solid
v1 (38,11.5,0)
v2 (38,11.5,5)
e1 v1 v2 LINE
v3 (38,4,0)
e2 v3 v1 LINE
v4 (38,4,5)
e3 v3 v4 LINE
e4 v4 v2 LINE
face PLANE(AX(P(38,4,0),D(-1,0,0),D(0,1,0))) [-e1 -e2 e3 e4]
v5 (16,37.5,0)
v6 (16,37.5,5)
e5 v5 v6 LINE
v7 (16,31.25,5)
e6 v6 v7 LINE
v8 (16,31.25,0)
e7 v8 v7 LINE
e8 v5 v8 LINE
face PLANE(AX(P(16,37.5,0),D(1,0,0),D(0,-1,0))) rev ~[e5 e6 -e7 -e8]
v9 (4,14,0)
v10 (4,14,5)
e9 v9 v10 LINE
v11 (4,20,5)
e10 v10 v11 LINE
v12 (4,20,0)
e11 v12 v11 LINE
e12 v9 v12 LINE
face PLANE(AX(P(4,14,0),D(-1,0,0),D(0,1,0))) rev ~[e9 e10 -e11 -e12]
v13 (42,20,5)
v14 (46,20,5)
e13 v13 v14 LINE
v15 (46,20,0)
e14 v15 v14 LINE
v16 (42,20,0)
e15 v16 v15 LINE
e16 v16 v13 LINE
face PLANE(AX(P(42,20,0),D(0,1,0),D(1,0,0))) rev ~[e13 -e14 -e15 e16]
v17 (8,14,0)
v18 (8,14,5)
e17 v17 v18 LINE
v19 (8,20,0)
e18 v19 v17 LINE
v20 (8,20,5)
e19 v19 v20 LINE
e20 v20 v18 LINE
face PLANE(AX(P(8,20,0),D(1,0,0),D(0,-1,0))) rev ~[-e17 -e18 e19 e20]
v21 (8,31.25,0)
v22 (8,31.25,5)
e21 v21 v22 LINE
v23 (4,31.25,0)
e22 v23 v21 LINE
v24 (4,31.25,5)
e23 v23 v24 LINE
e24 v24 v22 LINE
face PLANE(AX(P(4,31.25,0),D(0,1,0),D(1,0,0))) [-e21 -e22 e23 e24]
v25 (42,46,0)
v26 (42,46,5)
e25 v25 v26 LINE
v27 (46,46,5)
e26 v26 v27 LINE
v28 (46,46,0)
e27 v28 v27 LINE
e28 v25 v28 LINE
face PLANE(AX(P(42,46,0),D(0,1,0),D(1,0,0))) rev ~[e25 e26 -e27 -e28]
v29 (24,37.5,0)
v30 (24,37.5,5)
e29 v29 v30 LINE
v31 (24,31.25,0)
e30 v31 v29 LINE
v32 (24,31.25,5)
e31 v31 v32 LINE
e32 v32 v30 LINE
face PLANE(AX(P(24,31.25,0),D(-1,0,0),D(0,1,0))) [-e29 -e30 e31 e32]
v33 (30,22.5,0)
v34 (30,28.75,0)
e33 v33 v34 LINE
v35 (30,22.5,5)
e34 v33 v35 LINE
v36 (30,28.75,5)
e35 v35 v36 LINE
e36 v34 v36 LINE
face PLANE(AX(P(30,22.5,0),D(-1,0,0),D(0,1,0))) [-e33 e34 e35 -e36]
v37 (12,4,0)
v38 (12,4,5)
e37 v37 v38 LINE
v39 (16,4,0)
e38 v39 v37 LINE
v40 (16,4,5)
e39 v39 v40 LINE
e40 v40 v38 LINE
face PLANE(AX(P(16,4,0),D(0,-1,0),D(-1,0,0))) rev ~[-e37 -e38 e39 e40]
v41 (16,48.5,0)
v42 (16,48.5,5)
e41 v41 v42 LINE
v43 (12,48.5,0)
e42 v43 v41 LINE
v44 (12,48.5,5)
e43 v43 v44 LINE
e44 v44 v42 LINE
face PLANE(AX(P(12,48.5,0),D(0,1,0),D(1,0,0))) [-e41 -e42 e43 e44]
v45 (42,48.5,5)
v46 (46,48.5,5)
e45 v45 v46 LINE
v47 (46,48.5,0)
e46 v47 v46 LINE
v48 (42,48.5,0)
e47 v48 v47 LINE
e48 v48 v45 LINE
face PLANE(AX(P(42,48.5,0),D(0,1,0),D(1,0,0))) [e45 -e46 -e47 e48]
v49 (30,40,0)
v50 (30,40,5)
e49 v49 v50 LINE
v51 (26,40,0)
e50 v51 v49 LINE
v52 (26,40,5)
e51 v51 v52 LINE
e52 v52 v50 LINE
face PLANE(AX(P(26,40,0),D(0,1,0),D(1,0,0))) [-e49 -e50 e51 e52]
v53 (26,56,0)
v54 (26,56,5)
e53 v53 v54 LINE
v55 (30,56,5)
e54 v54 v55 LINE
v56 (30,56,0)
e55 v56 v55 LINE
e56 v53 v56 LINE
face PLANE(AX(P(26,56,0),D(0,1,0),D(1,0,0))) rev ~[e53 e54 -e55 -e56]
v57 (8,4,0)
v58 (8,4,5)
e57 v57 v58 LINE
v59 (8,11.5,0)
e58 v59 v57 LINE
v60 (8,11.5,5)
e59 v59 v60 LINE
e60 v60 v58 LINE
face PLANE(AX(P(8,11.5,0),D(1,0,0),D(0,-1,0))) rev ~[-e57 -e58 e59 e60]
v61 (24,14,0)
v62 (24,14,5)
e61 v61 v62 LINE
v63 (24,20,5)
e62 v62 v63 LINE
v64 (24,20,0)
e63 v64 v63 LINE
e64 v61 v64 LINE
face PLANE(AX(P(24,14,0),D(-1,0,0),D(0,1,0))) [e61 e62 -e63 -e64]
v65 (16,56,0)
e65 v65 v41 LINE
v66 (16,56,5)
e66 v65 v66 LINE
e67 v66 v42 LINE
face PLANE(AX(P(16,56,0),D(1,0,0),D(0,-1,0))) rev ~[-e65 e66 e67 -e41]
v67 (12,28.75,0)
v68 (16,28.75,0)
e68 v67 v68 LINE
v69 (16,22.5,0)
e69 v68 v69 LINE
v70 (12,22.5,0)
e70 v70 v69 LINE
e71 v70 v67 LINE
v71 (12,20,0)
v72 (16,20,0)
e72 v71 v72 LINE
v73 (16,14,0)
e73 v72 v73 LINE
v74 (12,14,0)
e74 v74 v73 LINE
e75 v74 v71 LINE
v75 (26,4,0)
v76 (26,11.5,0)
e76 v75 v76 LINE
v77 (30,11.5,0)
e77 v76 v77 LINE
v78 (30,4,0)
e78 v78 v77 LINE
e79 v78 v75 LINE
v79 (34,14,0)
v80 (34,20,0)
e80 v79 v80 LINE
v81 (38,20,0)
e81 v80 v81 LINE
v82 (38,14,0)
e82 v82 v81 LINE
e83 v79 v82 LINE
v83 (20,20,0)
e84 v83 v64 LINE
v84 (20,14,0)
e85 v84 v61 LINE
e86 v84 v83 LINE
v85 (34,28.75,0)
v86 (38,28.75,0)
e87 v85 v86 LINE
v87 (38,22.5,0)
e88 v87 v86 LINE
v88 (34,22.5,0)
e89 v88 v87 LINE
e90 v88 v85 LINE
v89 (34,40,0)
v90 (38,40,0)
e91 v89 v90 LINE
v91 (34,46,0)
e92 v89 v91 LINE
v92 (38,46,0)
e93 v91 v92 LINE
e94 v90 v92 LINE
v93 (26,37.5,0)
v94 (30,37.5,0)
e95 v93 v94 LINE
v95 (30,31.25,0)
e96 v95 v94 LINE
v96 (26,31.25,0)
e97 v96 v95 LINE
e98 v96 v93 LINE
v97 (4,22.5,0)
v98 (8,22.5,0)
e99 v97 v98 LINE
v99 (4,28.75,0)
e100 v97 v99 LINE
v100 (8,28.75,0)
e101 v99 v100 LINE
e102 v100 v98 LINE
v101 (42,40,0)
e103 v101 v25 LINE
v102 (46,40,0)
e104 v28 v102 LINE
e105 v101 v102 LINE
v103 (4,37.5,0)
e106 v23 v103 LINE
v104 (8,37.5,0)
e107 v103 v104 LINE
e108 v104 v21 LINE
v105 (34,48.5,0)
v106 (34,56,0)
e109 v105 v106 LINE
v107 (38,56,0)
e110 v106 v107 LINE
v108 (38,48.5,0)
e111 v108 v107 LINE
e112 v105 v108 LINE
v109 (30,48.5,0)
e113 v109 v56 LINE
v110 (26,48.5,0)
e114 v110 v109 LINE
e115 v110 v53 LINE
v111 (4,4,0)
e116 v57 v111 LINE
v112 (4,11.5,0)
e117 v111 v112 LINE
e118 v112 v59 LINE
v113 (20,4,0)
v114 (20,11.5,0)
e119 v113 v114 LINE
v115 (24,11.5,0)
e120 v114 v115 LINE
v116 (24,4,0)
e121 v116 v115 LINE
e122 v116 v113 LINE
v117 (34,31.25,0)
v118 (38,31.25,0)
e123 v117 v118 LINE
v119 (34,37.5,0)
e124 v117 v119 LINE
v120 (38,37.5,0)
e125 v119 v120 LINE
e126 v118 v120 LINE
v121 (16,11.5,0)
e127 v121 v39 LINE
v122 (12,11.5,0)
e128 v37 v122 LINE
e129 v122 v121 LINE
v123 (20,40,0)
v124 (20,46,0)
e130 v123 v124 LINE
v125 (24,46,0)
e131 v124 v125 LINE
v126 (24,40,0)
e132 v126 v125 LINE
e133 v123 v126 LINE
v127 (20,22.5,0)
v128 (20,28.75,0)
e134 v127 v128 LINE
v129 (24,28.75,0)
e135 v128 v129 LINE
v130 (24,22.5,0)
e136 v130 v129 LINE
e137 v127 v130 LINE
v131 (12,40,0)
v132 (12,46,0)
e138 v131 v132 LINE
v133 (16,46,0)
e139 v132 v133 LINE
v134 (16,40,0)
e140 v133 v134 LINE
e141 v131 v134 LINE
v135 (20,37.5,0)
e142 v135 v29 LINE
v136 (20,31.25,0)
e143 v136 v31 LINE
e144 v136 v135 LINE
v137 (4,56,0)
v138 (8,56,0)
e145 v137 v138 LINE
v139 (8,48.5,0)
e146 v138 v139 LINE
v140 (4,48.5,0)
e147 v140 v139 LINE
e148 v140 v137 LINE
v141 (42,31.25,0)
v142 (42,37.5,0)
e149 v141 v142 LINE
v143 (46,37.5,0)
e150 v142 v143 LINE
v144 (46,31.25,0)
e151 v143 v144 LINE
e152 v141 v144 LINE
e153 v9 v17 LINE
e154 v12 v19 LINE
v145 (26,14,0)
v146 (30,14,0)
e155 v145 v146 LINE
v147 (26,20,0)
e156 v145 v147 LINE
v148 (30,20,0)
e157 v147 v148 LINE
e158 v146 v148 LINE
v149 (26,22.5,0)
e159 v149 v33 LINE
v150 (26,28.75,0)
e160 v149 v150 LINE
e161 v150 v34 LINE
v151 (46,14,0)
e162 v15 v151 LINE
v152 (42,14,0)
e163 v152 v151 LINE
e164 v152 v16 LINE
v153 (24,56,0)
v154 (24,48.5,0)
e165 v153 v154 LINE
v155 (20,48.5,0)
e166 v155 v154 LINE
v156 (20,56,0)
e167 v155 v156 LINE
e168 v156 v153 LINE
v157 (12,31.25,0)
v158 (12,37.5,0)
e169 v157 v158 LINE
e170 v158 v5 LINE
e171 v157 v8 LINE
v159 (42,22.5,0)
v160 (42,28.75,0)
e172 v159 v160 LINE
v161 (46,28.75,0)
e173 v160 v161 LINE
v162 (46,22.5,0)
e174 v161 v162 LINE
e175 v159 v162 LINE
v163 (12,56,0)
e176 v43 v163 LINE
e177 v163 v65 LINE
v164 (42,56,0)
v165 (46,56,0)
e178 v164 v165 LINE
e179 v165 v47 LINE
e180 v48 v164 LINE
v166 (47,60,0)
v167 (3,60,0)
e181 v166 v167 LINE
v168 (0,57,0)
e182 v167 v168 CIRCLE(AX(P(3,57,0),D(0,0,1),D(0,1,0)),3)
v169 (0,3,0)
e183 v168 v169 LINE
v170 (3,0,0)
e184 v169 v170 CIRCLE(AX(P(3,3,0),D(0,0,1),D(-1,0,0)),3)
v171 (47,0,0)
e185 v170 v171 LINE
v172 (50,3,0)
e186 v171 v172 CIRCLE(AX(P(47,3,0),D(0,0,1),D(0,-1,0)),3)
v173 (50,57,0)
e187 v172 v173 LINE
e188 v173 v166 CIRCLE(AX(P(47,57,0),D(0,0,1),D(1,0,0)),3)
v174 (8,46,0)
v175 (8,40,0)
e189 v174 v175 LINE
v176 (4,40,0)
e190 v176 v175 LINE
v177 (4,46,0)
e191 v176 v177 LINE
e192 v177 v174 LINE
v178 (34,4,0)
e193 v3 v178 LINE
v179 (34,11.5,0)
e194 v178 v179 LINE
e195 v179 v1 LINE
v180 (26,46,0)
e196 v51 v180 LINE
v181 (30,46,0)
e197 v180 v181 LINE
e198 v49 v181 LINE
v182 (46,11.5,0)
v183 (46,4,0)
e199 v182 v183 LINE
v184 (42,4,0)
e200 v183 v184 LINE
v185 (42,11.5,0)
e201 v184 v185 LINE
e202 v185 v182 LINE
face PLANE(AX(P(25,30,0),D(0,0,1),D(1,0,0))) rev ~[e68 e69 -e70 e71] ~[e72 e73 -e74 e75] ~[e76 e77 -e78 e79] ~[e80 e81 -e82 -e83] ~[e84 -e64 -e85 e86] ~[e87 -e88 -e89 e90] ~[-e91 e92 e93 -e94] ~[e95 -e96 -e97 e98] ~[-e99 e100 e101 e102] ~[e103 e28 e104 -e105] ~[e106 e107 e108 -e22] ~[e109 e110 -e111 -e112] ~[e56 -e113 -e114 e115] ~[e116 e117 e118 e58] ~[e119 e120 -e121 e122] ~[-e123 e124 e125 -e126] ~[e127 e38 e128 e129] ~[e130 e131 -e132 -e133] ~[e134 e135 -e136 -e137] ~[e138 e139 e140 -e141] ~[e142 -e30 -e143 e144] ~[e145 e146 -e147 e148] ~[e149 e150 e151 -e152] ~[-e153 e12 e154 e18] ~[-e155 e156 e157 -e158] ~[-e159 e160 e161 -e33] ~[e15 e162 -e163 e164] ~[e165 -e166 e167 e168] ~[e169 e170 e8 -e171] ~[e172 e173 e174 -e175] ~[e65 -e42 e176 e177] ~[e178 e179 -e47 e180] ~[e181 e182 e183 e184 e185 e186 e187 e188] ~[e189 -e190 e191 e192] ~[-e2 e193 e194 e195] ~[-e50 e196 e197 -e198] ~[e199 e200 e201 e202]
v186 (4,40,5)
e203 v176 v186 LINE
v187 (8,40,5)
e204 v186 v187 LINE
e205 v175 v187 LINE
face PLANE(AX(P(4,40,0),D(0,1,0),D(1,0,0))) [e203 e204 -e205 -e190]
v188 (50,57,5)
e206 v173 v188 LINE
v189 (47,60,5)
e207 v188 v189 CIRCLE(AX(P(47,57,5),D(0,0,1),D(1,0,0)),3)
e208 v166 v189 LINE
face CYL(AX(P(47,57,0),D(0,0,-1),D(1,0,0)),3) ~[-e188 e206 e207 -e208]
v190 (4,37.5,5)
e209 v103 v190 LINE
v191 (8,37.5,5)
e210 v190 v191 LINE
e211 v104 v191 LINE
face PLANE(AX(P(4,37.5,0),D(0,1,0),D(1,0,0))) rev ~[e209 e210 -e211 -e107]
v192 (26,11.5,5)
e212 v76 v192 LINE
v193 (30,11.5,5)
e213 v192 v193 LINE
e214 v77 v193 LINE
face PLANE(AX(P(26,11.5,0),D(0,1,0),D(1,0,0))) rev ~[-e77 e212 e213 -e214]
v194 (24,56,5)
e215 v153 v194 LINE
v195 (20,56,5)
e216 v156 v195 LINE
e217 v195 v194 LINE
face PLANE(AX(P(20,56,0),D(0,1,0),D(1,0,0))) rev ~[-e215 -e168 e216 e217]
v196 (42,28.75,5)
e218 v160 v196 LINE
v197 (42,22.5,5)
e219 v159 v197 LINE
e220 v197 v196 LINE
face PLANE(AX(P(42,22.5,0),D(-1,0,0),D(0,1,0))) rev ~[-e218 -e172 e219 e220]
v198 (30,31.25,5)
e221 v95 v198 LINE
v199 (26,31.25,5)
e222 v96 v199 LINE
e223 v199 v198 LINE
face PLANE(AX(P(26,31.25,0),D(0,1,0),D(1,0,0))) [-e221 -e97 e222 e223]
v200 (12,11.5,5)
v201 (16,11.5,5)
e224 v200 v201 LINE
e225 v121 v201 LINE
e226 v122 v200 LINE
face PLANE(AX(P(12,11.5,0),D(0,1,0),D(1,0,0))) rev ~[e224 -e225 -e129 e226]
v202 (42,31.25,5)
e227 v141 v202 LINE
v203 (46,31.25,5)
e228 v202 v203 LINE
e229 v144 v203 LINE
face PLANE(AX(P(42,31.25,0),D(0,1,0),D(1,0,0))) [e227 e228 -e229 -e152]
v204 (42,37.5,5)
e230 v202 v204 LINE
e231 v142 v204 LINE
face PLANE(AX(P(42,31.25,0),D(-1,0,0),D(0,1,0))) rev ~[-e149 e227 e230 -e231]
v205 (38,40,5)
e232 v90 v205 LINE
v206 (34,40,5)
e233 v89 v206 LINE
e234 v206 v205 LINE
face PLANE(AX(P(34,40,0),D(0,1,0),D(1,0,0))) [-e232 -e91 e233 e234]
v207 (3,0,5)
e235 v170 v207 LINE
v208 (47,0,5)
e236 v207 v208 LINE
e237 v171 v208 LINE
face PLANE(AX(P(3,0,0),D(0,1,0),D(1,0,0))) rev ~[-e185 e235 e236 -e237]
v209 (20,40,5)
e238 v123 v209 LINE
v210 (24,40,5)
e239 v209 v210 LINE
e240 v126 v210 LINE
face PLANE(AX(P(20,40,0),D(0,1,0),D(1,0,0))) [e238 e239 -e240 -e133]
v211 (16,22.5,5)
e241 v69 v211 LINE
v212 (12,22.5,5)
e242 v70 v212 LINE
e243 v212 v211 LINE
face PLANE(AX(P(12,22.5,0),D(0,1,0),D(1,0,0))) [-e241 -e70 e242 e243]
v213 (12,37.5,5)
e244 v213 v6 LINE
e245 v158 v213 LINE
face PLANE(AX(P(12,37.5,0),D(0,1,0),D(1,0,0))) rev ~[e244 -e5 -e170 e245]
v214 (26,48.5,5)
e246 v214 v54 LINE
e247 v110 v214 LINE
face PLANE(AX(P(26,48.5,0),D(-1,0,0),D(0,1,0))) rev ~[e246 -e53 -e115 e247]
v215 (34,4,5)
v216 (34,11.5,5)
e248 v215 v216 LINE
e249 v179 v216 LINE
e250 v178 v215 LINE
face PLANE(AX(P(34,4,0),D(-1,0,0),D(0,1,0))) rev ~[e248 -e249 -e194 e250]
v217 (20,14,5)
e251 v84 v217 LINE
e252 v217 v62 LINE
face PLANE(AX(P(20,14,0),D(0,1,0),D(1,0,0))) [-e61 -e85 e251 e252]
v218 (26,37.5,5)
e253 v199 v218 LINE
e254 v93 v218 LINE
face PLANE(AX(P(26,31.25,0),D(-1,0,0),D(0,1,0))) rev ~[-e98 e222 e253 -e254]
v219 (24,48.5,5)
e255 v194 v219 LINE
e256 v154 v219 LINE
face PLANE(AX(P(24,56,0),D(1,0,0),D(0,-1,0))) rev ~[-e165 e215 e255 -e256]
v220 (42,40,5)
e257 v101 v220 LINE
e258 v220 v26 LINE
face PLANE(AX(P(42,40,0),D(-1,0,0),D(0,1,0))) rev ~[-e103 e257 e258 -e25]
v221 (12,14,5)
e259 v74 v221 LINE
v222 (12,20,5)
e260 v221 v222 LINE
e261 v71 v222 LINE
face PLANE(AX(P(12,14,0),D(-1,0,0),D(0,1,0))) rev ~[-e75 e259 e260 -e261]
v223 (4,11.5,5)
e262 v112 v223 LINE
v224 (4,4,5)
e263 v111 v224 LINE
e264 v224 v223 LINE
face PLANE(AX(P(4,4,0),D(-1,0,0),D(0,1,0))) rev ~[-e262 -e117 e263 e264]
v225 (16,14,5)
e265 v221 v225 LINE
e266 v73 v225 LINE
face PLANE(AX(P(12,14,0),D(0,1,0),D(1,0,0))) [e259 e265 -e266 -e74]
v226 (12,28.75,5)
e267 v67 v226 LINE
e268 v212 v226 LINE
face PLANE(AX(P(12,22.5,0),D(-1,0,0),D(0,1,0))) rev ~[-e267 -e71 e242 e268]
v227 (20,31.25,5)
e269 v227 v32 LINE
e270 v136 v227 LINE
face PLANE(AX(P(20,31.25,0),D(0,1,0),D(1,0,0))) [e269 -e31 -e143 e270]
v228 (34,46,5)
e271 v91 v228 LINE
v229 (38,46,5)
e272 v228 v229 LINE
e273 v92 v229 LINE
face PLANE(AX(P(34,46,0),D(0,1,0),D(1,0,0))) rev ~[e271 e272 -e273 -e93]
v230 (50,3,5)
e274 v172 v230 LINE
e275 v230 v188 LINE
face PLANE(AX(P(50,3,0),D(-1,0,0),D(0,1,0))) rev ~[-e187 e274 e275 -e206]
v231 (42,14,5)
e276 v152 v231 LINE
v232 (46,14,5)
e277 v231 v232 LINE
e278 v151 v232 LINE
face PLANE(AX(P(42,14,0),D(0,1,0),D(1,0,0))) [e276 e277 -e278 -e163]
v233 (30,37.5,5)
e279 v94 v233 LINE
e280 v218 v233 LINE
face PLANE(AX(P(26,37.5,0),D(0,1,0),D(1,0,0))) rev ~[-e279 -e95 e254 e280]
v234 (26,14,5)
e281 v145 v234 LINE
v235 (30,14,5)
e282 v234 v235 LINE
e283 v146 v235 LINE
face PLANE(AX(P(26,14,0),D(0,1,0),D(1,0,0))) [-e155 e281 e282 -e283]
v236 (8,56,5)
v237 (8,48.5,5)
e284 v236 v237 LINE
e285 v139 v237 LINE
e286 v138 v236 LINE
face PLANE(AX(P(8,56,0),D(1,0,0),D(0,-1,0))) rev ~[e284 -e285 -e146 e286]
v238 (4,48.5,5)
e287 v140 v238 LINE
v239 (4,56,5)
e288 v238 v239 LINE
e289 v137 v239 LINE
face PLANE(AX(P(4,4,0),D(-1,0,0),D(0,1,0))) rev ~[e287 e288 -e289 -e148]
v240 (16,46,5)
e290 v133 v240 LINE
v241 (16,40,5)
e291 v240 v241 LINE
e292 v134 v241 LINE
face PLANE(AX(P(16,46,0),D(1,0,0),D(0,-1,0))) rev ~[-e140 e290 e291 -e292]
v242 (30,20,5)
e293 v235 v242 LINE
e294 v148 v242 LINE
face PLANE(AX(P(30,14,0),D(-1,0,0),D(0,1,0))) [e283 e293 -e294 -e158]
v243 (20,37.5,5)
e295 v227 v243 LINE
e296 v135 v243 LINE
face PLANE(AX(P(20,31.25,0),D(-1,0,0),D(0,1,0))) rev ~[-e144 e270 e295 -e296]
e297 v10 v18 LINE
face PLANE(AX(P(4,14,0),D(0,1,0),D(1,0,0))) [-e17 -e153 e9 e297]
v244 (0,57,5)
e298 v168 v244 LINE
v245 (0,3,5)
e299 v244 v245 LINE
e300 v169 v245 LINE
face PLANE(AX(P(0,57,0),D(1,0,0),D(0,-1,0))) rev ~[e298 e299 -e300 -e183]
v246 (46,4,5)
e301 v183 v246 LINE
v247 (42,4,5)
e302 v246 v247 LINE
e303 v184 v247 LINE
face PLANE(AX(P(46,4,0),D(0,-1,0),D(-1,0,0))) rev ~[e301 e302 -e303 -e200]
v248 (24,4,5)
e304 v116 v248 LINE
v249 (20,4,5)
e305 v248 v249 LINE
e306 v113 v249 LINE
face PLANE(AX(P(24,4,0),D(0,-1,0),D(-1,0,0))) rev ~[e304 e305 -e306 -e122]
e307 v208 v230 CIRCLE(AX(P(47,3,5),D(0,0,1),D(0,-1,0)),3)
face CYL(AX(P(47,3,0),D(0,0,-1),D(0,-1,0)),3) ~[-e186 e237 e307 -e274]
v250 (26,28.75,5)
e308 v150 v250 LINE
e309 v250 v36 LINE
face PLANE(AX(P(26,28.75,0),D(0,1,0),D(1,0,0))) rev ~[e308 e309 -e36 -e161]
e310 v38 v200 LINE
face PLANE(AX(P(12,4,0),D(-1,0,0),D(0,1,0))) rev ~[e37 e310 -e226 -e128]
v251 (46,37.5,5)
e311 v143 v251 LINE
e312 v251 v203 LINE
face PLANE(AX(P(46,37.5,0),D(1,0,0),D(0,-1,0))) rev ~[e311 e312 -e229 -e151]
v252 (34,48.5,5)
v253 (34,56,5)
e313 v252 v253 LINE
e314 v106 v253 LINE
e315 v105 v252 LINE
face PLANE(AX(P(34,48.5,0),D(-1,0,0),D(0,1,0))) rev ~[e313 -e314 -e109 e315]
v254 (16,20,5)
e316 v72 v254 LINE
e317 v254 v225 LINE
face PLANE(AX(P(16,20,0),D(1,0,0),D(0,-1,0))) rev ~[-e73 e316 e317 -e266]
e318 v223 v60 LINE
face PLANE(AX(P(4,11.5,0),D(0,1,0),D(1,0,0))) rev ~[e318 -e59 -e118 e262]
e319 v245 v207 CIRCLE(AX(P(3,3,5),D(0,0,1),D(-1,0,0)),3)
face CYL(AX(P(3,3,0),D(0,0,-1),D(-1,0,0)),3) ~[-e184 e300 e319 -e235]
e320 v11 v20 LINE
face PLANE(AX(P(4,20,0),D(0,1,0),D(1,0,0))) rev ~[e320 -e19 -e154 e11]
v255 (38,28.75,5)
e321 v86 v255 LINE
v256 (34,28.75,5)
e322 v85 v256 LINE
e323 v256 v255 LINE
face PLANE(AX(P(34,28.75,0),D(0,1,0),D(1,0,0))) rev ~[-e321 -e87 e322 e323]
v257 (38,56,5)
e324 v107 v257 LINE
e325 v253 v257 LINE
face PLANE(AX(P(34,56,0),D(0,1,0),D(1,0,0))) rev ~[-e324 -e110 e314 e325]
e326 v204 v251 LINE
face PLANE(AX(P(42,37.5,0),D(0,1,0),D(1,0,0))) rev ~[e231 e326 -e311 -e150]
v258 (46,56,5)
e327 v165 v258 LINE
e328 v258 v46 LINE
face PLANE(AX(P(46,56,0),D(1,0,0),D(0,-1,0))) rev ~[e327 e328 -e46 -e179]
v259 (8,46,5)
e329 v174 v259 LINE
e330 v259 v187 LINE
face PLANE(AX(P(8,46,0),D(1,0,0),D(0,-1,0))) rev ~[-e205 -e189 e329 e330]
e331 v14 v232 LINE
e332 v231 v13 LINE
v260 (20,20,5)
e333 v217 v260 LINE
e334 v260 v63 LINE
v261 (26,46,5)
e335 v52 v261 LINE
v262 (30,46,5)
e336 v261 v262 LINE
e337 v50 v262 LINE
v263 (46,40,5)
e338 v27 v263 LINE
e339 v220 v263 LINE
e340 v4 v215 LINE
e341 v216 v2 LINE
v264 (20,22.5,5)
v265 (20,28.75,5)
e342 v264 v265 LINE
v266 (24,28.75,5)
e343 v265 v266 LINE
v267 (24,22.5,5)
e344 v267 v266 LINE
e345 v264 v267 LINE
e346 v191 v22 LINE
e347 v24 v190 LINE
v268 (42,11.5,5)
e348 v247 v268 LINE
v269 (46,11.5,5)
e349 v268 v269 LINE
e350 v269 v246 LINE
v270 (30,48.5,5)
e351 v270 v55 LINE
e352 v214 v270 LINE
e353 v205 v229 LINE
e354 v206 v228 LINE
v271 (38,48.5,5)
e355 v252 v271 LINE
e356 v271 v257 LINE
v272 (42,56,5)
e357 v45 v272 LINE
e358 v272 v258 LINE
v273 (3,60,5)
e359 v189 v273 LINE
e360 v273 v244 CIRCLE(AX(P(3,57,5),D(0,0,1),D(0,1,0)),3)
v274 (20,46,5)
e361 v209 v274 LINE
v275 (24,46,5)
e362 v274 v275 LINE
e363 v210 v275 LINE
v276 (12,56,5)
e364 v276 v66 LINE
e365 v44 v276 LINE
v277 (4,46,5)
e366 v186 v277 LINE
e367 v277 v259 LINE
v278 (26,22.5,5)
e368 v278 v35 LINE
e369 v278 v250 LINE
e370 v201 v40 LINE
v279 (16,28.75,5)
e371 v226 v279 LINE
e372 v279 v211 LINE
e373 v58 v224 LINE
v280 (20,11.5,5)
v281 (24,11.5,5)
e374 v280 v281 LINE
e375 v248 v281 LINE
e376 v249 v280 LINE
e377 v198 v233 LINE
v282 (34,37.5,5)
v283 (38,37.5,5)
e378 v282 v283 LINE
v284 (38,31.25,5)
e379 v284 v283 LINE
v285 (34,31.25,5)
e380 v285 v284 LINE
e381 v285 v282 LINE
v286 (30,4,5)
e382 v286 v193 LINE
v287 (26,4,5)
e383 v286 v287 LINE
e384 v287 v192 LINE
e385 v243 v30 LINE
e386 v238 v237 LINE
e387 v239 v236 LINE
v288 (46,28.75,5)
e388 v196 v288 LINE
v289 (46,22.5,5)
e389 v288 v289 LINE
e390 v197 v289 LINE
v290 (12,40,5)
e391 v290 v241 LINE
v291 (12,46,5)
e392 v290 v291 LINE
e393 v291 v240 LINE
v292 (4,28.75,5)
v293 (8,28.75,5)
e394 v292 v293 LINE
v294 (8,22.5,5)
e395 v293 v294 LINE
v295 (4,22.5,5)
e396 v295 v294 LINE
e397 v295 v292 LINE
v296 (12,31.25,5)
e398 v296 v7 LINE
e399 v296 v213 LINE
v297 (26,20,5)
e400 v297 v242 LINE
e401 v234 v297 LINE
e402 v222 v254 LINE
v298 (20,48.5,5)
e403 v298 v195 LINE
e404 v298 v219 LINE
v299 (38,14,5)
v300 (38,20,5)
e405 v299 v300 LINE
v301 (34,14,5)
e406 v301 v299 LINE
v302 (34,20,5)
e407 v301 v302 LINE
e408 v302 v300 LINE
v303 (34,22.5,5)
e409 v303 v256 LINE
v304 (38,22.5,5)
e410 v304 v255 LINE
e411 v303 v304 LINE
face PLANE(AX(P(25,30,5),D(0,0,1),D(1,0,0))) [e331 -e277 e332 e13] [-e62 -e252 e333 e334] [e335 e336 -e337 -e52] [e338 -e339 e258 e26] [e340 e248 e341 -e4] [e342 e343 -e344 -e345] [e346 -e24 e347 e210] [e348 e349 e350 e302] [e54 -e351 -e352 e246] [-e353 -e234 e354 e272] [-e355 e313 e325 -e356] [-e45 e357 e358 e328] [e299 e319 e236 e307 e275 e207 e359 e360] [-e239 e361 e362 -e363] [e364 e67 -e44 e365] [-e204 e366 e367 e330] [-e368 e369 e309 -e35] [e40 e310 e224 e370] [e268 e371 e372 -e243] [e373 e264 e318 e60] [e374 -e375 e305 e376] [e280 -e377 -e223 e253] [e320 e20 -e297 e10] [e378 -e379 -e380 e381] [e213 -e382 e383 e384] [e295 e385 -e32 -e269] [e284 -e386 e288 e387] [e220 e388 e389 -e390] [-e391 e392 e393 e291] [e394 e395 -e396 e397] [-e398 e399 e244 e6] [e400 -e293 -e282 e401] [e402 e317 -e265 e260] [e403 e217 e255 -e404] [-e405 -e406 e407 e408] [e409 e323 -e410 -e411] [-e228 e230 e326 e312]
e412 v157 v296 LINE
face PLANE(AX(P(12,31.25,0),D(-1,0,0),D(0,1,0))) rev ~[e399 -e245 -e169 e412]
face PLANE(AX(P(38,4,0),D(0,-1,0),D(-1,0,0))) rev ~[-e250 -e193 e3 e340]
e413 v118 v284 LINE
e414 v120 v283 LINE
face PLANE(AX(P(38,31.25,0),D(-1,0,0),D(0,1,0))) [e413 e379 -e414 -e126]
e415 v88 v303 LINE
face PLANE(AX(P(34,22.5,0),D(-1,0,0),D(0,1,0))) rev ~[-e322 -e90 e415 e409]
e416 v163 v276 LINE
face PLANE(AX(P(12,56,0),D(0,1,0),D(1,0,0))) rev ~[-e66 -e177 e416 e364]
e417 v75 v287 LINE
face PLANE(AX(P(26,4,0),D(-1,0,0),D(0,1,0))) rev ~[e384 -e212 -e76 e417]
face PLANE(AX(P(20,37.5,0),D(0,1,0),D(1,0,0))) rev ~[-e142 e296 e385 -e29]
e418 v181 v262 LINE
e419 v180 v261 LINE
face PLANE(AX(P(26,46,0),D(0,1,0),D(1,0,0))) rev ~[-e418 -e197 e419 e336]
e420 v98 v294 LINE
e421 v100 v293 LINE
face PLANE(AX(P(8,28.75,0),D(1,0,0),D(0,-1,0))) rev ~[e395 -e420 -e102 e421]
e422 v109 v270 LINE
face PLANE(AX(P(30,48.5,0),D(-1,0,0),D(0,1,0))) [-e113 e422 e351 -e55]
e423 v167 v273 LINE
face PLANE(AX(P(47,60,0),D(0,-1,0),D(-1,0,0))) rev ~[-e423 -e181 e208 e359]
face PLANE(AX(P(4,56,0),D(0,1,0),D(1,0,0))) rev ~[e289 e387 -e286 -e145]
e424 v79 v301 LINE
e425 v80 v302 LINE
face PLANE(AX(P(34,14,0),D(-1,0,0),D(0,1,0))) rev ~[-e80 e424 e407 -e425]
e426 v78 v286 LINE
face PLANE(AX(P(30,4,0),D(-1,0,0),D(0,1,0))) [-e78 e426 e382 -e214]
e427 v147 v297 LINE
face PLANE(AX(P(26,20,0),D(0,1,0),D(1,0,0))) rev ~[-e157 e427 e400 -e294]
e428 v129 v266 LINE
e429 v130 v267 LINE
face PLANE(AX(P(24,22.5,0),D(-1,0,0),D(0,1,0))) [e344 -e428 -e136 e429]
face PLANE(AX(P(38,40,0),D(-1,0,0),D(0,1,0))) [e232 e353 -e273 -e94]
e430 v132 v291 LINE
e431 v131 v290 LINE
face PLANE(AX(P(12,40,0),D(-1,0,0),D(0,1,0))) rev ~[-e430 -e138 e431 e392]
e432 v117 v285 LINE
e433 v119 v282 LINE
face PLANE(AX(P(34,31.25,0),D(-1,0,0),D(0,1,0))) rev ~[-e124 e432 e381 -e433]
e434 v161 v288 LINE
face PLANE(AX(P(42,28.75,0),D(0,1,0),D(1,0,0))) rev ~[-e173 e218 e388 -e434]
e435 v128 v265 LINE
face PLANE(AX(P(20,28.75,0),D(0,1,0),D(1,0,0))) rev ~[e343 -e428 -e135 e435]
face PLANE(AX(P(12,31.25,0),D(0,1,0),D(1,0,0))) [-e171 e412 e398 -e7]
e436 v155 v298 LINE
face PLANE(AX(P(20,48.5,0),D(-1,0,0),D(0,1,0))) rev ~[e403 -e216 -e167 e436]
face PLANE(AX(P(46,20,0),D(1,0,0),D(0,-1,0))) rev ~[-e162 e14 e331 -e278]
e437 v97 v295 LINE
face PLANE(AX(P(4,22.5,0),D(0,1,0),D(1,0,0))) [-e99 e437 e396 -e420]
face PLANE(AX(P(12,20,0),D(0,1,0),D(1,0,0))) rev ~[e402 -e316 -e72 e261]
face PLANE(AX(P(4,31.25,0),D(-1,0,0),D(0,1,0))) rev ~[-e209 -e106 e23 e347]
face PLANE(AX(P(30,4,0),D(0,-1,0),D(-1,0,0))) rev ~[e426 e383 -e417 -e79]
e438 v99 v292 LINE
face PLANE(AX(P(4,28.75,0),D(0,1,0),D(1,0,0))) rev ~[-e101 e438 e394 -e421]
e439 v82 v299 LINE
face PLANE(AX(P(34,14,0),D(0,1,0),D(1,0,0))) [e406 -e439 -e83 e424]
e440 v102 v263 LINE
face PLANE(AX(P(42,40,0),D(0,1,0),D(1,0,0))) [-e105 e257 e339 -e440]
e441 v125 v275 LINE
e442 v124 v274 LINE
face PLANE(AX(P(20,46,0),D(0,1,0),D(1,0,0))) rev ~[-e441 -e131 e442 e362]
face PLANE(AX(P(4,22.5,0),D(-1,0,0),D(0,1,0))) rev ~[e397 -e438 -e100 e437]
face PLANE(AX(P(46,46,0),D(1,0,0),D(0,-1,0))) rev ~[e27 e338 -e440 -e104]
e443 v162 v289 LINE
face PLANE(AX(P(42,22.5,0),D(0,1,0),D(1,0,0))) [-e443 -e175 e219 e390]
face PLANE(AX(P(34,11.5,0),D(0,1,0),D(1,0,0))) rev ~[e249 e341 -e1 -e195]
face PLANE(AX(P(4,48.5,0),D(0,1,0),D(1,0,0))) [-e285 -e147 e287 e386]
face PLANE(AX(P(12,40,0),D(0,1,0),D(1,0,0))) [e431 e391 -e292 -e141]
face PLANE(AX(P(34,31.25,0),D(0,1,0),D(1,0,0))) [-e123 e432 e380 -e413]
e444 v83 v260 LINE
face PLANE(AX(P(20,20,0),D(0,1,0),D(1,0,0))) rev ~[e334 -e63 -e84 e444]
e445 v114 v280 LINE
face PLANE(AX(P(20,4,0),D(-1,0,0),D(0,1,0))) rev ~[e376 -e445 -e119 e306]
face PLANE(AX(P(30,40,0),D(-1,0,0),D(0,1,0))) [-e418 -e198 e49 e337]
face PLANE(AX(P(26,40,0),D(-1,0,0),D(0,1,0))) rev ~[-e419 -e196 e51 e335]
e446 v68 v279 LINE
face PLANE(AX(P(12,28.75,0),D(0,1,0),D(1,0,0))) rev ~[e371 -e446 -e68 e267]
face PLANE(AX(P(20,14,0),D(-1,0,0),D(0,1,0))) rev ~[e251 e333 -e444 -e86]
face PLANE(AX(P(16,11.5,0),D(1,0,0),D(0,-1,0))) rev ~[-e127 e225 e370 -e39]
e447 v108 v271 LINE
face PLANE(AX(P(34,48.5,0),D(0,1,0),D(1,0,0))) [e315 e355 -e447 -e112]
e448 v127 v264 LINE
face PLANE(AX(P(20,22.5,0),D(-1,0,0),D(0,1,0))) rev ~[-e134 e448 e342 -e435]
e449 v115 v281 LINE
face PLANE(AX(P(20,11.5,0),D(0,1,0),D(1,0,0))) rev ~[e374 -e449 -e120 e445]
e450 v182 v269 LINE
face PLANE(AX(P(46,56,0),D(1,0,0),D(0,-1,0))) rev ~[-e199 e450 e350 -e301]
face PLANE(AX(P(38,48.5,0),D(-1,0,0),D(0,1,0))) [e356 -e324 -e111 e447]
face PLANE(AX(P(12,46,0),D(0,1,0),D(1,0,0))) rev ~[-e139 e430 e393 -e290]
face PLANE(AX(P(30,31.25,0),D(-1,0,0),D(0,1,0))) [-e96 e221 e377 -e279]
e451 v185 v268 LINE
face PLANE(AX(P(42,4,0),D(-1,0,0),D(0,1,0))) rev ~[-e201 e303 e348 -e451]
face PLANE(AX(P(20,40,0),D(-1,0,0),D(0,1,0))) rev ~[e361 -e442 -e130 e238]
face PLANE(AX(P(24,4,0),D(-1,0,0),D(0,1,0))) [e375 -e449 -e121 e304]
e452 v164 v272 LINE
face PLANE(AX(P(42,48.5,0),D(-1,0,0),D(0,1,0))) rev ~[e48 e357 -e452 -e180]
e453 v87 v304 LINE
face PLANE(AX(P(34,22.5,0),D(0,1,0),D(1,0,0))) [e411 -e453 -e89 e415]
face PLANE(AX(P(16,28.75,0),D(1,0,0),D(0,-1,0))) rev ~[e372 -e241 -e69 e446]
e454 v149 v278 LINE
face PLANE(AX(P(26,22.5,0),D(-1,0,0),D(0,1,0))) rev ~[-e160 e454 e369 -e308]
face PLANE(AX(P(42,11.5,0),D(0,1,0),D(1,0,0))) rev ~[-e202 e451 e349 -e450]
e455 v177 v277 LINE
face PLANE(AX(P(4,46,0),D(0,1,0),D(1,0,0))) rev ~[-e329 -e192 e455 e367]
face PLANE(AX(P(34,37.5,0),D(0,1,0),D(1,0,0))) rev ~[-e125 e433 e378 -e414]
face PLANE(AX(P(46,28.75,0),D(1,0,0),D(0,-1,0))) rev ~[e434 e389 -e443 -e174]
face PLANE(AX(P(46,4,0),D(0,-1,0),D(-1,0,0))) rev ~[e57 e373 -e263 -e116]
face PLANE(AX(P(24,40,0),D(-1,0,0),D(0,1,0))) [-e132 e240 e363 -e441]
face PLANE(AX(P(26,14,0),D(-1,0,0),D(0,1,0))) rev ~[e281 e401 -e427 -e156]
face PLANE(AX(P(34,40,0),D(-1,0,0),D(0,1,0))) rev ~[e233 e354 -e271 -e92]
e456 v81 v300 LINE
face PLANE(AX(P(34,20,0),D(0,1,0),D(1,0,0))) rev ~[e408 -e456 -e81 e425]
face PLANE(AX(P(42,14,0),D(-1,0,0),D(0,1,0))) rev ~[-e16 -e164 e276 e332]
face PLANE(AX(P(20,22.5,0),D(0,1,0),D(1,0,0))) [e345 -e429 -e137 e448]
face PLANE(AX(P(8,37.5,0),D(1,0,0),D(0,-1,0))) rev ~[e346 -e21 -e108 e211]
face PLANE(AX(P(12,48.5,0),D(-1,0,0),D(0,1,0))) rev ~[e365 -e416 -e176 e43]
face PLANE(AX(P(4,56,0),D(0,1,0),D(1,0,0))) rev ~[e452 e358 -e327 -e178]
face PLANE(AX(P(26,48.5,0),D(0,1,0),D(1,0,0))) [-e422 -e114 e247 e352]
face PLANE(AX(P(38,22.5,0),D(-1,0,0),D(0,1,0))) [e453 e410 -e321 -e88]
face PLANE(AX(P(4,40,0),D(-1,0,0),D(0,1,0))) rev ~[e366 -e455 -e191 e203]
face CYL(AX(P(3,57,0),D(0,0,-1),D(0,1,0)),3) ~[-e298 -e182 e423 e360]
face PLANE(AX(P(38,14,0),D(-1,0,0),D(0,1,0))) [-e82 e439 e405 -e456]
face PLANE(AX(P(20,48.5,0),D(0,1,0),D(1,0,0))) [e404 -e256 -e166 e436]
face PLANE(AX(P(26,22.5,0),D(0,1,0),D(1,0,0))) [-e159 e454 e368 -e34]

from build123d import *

# Parameters (mm, degrees)
F1_DEPTH = 5
F0_W     = 4
F0_H     = 7.5
F0_H_2   = 6.25
F0_H_3   = 6
F0_W_2   = 2
F0_H_4   = 2.5
F2_DEPTH = 5


# Not quite as in the source:
# - a feature names something its author has since deleted; it is built from what else it names


with BuildPart() as f1:
    # F0 (on Top) → F1 (new body)
    with BuildSketch(Plane.XY):
        with BuildLine():
            ThreePointArc((0, 3), (0.8786796564, 0.8786796564), (3, 0))
            Line((3, 0), (47, 0))
            ThreePointArc((47, 0), (49.1213203436, 0.8786796564), (50, 3))
            Line((50, 3), (50, 57))
            ThreePointArc((50, 57), (49.1213203436, 59.1213203436), (47, 60))
            Line((47, 60), (25, 60))
            Line((25, 60), (3, 60))
            ThreePointArc((3, 60), (0.8786796564, 59.1213203436), (0, 57))
            Line((0, 57), (0, 3))
        make_face()
        Polygon((24, 56), (25, 56), (26, 56), (30, 56), (34, 56), (38, 56), (42, 56), (46, 56), (46, 48.5), (46, 46), (46, 40), (46, 37.5), (46, 31.25), (46, 28.75), (46, 22.5), (46, 20), (46, 14), (46, 11.5), (46, 4), (42, 4), (38, 4), (34, 4), (30, 4), (26, 4), (24, 4), (20, 4), (16, 4), (12, 4), (8, 4), (4, 4), (4, 11.5), (4, 14), (4, 20), (4, 22.5), (4, 28.75), (4, 31.25), (4, 37.5), (4, 40), (4, 46), (4, 48.5), (4, 56), (8, 56), (12, 56), (16, 56), (20, 56), align=None, mode=Mode.SUBTRACT)
    extrude(amount=F1_DEPTH)

    # F0 (on Top) → F2 (join)
    with BuildSketch(Plane.XY):
        with BuildLine():
            ThreePointArc((0, 3), (0.8786796564, 0.8786796564), (3, 0))
            Line((3, 0), (47, 0))
            ThreePointArc((47, 0), (49.1213203436, 0.8786796564), (50, 3))
            Line((50, 3), (50, 57))
            ThreePointArc((50, 57), (49.1213203436, 59.1213203436), (47, 60))
            Line((47, 60), (25, 60))
            Line((25, 60), (3, 60))
            ThreePointArc((3, 60), (0.8786796564, 59.1213203436), (0, 57))
            Line((0, 57), (0, 3))
        make_face()
        Polygon((24, 56), (25, 56), (26, 56), (30, 56), (34, 56), (38, 56), (42, 56), (46, 56), (46, 48.5), (46, 46), (46, 40), (46, 37.5), (46, 31.25), (46, 28.75), (46, 22.5), (46, 20), (46, 14), (46, 11.5), (46, 4), (42, 4), (38, 4), (34, 4), (30, 4), (26, 4), (24, 4), (20, 4), (16, 4), (12, 4), (8, 4), (4, 4), (4, 11.5), (4, 14), (4, 20), (4, 22.5), (4, 28.75), (4, 31.25), (4, 37.5), (4, 40), (4, 46), (4, 48.5), (4, 56), (8, 56), (12, 56), (16, 56), (20, 56), align=None, mode=Mode.SUBTRACT)
        with Locations((18, 52.25)):
            Rectangle(F0_W, F0_H)
        with Locations((32, 52.25)):
            Rectangle(F0_W, F0_H)
        with Locations((10, 52.25)):
            Rectangle(F0_W, F0_H)
        with Locations((40, 52.25)):
            Rectangle(F0_W, F0_H)
        with Locations((18, 7.75)):
            Rectangle(F0_W, F0_H)
        with Locations((32, 7.75)):
            Rectangle(F0_W, F0_H)
        with Locations((10, 7.75)):
            Rectangle(F0_W, F0_H)
        with Locations((40, 7.75)):
            Rectangle(F0_W, F0_H)
        with Locations((18, 34.375)):
            Rectangle(F0_W, F0_H_2)
        with Locations((32, 34.375)):
            Rectangle(F0_W, F0_H_2)
        with Locations((10, 34.375)):
            Rectangle(F0_W, F0_H_2)
        with Locations((18, 25.625)):
            Rectangle(F0_W, F0_H_2)
        with Locations((40, 34.375)):
            Rectangle(F0_W, F0_H_2)
        with Locations((32, 25.625)):
            Rectangle(F0_W, F0_H_2)
        with Locations((10, 25.625)):
            Rectangle(F0_W, F0_H_2)
        with Locations((40, 25.625)):
            Rectangle(F0_W, F0_H_2)
        with Locations((18, 43)):
            Rectangle(F0_W, F0_H_3)
        with Locations((32, 43)):
            Rectangle(F0_W, F0_H_3)
        with Locations((10, 43)):
            Rectangle(F0_W, F0_H_3)
        with Locations((40, 43)):
            Rectangle(F0_W, F0_H_3)
        with Locations((18, 17)):
            Rectangle(F0_W, F0_H_3)
        with Locations((32, 17)):
            Rectangle(F0_W, F0_H_3)
        with Locations((10, 17)):
            Rectangle(F0_W, F0_H_3)
        with Locations((40, 17)):
            Rectangle(F0_W, F0_H_3)
        Polygon((26, 56), (25, 56), (24, 56), (24, 48.5), (26, 48.5), align=None)
        with Locations((25, 7.75)):
            Rectangle(F0_W_2, F0_H)
        with Locations((25, 34.375)):
            Rectangle(F0_W_2, F0_H_2)
        with Locations((25, 25.625)):
            Rectangle(F0_W_2, F0_H_2)
        with Locations((25, 43)):
            Rectangle(F0_W_2, F0_H_3)
        with Locations((25, 17)):
            Rectangle(F0_W_2, F0_H_3)
        with Locations((22, 47.25)):
            Rectangle(F0_W, F0_H_4)
        with Locations((28, 47.25)):
            Rectangle(F0_W, F0_H_4)
        with Locations((18, 47.25)):
            Rectangle(F0_W, F0_H_4)
        with Locations((32, 47.25)):
            Rectangle(F0_W, F0_H_4)
        with Locations((14, 47.25)):
            Rectangle(F0_W, F0_H_4)
        with Locations((22, 38.75)):
            Rectangle(F0_W, F0_H_4)
        with Locations((36, 47.25)):
            Rectangle(F0_W, F0_H_4)
        with Locations((28, 38.75)):
            Rectangle(F0_W, F0_H_4)
        with Locations((10, 47.25)):
            Rectangle(F0_W, F0_H_4)
        with Locations((18, 38.75)):
            Rectangle(F0_W, F0_H_4)
        with Locations((40, 47.25)):
            Rectangle(F0_W, F0_H_4)
        with Locations((32, 38.75)):
            Rectangle(F0_W, F0_H_4)
        with Locations((6, 47.25)):
            Rectangle(F0_W, F0_H_4)
        with Locations((14, 38.75)):
            Rectangle(F0_W, F0_H_4)
        with Locations((22, 30)):
            Rectangle(F0_W, F0_H_4)
        with Locations((44, 47.25)):
            Rectangle(F0_W, F0_H_4)
        with Locations((36, 38.75)):
            Rectangle(F0_W, F0_H_4)
        with Locations((28, 30)):
            Rectangle(F0_W, F0_H_4)
        with Locations((10, 38.75)):
            Rectangle(F0_W, F0_H_4)
        with Locations((18, 30)):
            Rectangle(F0_W, F0_H_4)
        with Locations((40, 38.75)):
            Rectangle(F0_W, F0_H_4)
        with Locations((32, 30)):
            Rectangle(F0_W, F0_H_4)
        with Locations((6, 38.75)):
            Rectangle(F0_W, F0_H_4)
        with Locations((14, 30)):
            Rectangle(F0_W, F0_H_4)
        with Locations((22, 21.25)):
            Rectangle(F0_W, F0_H_4)
        with Locations((44, 38.75)):
            Rectangle(F0_W, F0_H_4)
        with Locations((36, 30)):
            Rectangle(F0_W, F0_H_4)
        with Locations((28, 21.25)):
            Rectangle(F0_W, F0_H_4)
        with Locations((10, 30)):
            Rectangle(F0_W, F0_H_4)
        with Locations((18, 21.25)):
            Rectangle(F0_W, F0_H_4)
        with Locations((40, 30)):
            Rectangle(F0_W, F0_H_4)
        with Locations((32, 21.25)):
            Rectangle(F0_W, F0_H_4)
        with Locations((6, 30)):
            Rectangle(F0_W, F0_H_4)
        with Locations((14, 21.25)):
            Rectangle(F0_W, F0_H_4)
        with Locations((22, 12.75)):
            Rectangle(F0_W, F0_H_4)
        with Locations((44, 30)):
            Rectangle(F0_W, F0_H_4)
        with Locations((36, 21.25)):
            Rectangle(F0_W, F0_H_4)
        with Locations((28, 12.75)):
            Rectangle(F0_W, F0_H_4)
        with Locations((10, 21.25)):
            Rectangle(F0_W, F0_H_4)
        with Locations((18, 12.75)):
            Rectangle(F0_W, F0_H_4)
        with Locations((40, 21.25)):
            Rectangle(F0_W, F0_H_4)
        with Locations((32, 12.75)):
            Rectangle(F0_W, F0_H_4)
        with Locations((6, 21.25)):
            Rectangle(F0_W, F0_H_4)
        with Locations((14, 12.75)):
            Rectangle(F0_W, F0_H_4)
        with Locations((44, 21.25)):
            Rectangle(F0_W, F0_H_4)
        with Locations((36, 12.75)):
            Rectangle(F0_W, F0_H_4)
        with Locations((10, 12.75)):
            Rectangle(F0_W, F0_H_4)
        with Locations((40, 12.75)):
            Rectangle(F0_W, F0_H_4)
        with Locations((6, 12.75)):
            Rectangle(F0_W, F0_H_4)
        with Locations((44, 12.75)):
            Rectangle(F0_W, F0_H_4)
        with Locations((25, 47.25)):
            Rectangle(F0_W_2, F0_H_4)
        with Locations((25, 38.75)):
            Rectangle(F0_W_2, F0_H_4)
        with Locations((25, 30)):
            Rectangle(F0_W_2, F0_H_4)
        with Locations((25, 21.25)):
            Rectangle(F0_W_2, F0_H_4)
        with Locations((25, 12.75)):
            Rectangle(F0_W_2, F0_H_4)
    extrude(amount=F2_DEPTH)


solid = f1.part
